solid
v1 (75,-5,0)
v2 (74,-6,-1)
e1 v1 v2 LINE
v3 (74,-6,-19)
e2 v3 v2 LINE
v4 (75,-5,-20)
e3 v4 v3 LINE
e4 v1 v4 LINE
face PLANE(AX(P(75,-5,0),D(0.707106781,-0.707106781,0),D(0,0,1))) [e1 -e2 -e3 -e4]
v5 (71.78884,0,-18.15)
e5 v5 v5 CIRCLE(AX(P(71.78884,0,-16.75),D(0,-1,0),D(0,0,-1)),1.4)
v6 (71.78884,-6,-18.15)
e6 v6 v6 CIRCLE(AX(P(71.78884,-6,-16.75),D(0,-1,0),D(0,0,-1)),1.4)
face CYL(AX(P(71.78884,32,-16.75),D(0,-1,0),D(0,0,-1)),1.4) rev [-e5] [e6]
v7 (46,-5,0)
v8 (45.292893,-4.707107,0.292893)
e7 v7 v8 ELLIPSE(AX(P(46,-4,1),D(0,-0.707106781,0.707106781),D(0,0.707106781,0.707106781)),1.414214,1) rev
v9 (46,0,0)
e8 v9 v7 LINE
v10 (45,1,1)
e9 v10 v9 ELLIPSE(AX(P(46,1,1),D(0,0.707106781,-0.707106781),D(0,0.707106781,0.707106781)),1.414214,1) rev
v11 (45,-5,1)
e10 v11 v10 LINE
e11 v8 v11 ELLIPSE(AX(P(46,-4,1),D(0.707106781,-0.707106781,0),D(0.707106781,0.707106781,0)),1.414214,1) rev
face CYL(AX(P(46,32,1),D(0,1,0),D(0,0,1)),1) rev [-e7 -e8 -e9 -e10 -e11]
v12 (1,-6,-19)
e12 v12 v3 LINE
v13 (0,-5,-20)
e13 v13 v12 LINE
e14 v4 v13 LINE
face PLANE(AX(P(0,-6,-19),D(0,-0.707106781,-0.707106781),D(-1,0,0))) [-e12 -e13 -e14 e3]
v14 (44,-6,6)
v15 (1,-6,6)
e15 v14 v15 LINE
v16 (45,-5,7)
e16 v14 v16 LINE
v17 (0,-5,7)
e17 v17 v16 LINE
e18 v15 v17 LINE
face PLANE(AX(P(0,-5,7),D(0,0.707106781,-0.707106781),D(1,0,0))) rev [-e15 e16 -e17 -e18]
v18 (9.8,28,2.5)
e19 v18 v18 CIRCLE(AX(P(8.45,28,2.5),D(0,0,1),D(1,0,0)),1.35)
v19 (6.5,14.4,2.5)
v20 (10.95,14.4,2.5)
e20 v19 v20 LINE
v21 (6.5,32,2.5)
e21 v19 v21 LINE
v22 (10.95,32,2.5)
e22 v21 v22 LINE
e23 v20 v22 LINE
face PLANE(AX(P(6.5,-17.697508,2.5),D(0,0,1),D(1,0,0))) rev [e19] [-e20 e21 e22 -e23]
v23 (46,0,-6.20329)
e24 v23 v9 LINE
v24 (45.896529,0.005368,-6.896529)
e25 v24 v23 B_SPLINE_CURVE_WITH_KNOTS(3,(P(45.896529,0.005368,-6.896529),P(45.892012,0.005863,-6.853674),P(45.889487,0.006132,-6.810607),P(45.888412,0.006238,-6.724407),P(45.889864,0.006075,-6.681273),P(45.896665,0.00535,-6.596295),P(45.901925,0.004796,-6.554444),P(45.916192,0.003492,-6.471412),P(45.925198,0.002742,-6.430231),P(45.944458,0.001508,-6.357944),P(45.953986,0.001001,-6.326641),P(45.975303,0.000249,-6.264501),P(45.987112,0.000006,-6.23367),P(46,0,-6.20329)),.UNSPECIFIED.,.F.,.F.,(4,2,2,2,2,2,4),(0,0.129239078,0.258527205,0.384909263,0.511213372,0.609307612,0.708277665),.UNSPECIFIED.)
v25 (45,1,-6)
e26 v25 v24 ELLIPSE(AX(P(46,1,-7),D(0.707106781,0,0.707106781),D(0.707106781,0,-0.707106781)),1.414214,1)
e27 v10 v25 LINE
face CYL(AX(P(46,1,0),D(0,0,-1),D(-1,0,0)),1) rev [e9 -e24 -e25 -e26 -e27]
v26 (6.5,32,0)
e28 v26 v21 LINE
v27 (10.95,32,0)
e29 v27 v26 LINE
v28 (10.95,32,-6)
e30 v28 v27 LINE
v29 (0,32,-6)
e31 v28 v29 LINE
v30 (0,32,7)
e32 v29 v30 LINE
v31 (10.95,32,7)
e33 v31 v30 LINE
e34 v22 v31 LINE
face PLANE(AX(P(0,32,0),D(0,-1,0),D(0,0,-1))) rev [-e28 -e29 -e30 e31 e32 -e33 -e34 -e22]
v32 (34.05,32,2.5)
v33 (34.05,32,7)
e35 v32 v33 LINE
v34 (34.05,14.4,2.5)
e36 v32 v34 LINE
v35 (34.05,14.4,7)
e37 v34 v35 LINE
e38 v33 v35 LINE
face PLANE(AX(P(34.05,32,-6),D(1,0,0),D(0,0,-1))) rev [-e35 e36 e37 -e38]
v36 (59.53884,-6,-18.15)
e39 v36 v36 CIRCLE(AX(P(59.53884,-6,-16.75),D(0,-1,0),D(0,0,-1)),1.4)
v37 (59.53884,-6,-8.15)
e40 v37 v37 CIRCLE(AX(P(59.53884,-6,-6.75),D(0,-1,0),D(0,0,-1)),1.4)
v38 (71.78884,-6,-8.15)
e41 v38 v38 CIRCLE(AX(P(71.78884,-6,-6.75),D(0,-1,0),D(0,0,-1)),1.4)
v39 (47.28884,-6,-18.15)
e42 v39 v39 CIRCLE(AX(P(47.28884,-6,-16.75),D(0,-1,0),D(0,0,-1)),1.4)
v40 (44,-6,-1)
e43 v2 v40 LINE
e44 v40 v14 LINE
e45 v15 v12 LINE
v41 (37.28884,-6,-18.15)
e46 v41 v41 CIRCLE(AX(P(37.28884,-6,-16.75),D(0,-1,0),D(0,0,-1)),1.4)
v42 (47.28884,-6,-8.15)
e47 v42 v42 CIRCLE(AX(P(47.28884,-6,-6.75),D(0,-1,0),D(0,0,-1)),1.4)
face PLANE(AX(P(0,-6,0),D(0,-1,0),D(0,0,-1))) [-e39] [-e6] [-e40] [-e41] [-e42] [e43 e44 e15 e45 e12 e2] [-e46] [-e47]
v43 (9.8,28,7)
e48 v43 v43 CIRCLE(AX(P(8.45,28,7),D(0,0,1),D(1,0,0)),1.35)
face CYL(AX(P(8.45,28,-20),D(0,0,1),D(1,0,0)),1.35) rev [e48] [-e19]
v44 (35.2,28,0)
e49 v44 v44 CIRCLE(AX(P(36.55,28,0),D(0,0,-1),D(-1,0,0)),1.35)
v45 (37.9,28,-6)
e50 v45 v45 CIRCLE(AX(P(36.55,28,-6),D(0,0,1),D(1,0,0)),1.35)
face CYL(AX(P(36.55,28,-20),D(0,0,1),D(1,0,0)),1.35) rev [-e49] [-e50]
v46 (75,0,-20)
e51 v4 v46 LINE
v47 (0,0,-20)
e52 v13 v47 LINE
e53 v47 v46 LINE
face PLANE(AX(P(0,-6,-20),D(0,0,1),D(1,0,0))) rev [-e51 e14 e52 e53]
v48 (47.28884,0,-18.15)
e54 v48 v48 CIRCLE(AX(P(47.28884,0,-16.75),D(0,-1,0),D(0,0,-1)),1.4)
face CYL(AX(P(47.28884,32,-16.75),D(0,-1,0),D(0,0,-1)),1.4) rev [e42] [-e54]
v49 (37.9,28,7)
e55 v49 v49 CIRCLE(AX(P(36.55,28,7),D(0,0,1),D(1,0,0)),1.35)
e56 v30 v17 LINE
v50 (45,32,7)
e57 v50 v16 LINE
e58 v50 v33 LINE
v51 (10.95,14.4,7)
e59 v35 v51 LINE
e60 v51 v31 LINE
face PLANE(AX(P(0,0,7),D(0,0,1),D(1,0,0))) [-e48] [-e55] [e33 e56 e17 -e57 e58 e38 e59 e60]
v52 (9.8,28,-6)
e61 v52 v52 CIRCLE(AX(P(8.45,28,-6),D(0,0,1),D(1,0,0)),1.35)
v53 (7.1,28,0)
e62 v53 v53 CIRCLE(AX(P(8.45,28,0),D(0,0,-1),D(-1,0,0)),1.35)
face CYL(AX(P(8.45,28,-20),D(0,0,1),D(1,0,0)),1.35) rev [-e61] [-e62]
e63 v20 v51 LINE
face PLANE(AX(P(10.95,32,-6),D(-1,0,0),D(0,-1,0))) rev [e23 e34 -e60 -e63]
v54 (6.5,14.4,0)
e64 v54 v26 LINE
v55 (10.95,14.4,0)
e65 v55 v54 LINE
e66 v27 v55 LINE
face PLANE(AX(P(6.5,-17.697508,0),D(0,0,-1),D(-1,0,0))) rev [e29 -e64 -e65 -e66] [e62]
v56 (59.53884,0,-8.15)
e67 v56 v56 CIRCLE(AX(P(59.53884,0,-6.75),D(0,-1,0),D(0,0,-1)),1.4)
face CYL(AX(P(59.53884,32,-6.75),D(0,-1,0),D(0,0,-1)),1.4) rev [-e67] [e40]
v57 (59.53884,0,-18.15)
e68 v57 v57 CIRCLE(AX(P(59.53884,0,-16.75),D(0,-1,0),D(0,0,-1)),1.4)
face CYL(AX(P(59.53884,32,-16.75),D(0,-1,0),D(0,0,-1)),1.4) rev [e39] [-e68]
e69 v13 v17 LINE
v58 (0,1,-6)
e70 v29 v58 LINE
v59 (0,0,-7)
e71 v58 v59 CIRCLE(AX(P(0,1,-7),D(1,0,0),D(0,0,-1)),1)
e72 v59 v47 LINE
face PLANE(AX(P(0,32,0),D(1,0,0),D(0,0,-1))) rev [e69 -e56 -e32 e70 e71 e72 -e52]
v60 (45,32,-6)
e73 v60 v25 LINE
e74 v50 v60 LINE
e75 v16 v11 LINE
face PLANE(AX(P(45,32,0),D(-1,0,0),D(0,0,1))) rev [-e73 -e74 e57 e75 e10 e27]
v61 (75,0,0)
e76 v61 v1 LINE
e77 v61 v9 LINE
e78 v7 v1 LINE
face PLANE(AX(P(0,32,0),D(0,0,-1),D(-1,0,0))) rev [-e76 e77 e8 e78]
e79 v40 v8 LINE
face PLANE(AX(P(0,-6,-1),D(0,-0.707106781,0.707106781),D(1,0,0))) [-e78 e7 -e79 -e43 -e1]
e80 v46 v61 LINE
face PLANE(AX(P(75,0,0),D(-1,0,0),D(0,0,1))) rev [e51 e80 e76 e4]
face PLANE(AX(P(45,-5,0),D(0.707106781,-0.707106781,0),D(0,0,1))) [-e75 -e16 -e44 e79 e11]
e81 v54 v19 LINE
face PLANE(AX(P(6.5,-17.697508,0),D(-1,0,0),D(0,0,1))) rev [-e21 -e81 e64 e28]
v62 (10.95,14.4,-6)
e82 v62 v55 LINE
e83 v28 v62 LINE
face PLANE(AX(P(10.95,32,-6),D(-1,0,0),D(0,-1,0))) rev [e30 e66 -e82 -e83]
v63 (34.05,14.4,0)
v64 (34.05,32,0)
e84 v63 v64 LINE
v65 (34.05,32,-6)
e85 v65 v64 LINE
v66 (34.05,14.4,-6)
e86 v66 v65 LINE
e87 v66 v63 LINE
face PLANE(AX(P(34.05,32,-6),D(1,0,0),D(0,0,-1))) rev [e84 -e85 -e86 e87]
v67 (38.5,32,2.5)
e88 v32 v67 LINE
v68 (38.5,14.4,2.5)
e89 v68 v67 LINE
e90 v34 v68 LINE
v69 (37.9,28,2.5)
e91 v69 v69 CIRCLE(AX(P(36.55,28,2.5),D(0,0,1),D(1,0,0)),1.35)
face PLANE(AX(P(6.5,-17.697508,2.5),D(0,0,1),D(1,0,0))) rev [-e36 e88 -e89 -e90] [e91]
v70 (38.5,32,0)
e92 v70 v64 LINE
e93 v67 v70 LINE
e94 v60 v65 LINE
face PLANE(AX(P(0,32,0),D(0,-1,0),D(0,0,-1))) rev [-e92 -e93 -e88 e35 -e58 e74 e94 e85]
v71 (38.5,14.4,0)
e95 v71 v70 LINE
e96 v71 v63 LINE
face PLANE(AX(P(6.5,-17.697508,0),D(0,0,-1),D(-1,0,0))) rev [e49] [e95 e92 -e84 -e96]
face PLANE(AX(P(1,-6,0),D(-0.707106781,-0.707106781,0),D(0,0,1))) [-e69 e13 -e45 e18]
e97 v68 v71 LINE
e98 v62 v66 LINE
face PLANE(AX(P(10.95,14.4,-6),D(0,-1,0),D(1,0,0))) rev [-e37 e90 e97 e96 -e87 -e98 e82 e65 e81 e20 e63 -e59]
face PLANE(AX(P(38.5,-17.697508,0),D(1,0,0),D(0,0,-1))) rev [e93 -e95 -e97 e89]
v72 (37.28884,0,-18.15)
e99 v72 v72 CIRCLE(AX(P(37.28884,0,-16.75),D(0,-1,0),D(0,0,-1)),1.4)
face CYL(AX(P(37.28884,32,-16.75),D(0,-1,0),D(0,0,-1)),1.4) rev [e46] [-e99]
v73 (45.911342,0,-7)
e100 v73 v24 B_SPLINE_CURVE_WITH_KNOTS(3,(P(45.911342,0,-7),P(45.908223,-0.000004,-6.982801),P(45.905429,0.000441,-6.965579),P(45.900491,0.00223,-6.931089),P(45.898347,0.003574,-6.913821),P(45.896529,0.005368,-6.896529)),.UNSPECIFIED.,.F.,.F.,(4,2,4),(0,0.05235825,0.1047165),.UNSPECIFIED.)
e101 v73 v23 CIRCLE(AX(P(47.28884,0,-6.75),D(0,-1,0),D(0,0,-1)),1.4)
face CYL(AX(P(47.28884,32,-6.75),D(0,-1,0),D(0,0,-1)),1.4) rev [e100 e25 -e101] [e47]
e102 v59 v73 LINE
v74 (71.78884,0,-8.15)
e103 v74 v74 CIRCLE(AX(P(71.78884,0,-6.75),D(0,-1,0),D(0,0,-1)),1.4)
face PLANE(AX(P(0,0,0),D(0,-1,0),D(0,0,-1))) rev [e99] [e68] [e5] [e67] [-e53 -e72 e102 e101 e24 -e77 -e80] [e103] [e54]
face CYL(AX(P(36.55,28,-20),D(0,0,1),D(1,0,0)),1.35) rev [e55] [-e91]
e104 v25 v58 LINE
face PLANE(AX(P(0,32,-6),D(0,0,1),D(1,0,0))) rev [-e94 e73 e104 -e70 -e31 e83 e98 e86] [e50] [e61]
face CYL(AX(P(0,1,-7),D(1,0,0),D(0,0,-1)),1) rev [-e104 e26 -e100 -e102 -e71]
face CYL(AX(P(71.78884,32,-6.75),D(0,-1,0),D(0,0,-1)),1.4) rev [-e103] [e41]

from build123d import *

# Parameters (mm, degrees)
SKETCH1_W           = 45
SKETCH1_H           = 6
BOSS_EXTRUDE1_DEPTH = 32
SKETCH2_W           = 23.1
SKETCH2_H           = 17.6
CUT_EXTRUDE1_DEPTH  = 56.542776308
SKETCH3_W           = 45
SKETCH3_H           = 20
BOSS_EXTRUDE2_DEPTH = 6
SKETCH4_W           = 20
SKETCH4_H           = 6
BOSS_EXTRUDE3_DEPTH = 30
SKETCH5_R           = 1.4
CUT_EXTRUDE2_DEPTH  = 87.423376467
BOSS_EXTRUDE4_DEPTH = 7
SKETCH7_W           = 32
SKETCH7_H           = 2.5
CUT_EXTRUDE3_DEPTH  = 17.6
SKETCH8_R           = 1.35
CUT_EXTRUDE4_DEPTH  = 86.895285086
CHAMFER1_SIZE       = 1
FILLET1_R           = 1


with BuildPart() as part:
    # Sketch1 → Boss-Extrude1 (new body)
    with BuildSketch(Plane(origin=(0, 0, 0), x_dir=(1, 0, 0), z_dir=(0, 1, 0))):
        with Locations((22.5, 3)):
            Rectangle(SKETCH1_W, SKETCH1_H)
    extrude(amount=BOSS_EXTRUDE1_DEPTH)

    # Sketch2 → Cut-Extrude1 (cut, through all)
    with BuildSketch(Plane.XY):
        with Locations((22.5, 23.2)):
            Rectangle(SKETCH2_W, SKETCH2_H)
    extrude(amount=-CUT_EXTRUDE1_DEPTH, mode=Mode.SUBTRACT)

    # Sketch3 → Boss-Extrude2 (add)
    with BuildSketch(Plane.XZ):
        with Locations((22.5, -10)):
            Rectangle(SKETCH3_W, SKETCH3_H)
    extrude(amount=BOSS_EXTRUDE2_DEPTH)

    # Sketch4 → Boss-Extrude3 (add)
    with BuildSketch(Plane(origin=(45, 0, 0), x_dir=(0, 0, -1), z_dir=(1, 0, 0))):
        with Locations((10, -3)):
            Rectangle(SKETCH4_W, SKETCH4_H)
    extrude(amount=BOSS_EXTRUDE3_DEPTH)

    # Sketch5 → Cut-Extrude2 (cut, through all)
    with BuildSketch(Plane.XZ.offset(6)):
        with Locations(Location((37.288839919, -16.75, 0), (0, 0, 270))):
            Circle(SKETCH5_R)
        with Locations(Location((47.288839919, -16.75, 0), (0, 0, 270))):
            Circle(SKETCH5_R)
        with Locations(Location((47.288839919, -6.75, 0), (0, 0, 270))):
            Circle(SKETCH5_R)
        with Locations(Location((59.538839919, -16.75, 0), (0, 0, 270))):
            Circle(SKETCH5_R)
        with Locations(Location((71.788839919, -16.75, 0), (0, 0, 270))):
            Circle(SKETCH5_R)
        with Locations(Location((71.788839919, -6.75, 0), (0, 0, 270))):
            Circle(SKETCH5_R)
        with Locations(Location((59.538839919, -6.75, 0), (0, 0, 270))):
            Circle(SKETCH5_R)
    extrude(amount=-CUT_EXTRUDE2_DEPTH, mode=Mode.SUBTRACT)

    # Sketch6 → Boss-Extrude4 (add)
    with BuildSketch(Plane.XY):
        Polygon((0, 32), (0, -6), (45, -6), (45, 0), (45, 32), (34.05, 32), (34.05, 14.4), (10.95, 14.4), (10.95, 32), align=None)
    extrude(amount=BOSS_EXTRUDE4_DEPTH)

    # Sketch7 → Cut-Extrude3 (cut)
    with BuildSketch(Plane(origin=(0, 32, 0), x_dir=(1, 0, 0), z_dir=(0, 1, 0))):
        with Locations((22.5, -1.25)):
            Rectangle(SKETCH7_W, SKETCH7_H)
    extrude(amount=-CUT_EXTRUDE3_DEPTH, mode=Mode.SUBTRACT)

    # Sketch8 → Cut-Extrude4 (cut, through all)
    with BuildSketch(Plane.XY.offset(7)):
        with Locations((8.45, 28)):
            Circle(SKETCH8_R)
        with Locations((36.55, 28)):
            Circle(SKETCH8_R)
    extrude(amount=-CUT_EXTRUDE4_DEPTH, mode=Mode.SUBTRACT)

    # Chamfer1
    chamfer1_edges = [part.edges().sort_by_distance(p)[0] for p in [
        (22.5, -6, 7),
        (0, -6, -6.5),
        (37.5, -6, -20),
        (60, -6, 0),
        (75, -6, -10),
        (45, -6, 3.5),
    ]]
    chamfer(chamfer1_edges, length=CHAMFER1_SIZE)

    # Fillet1
    # the kernel refuses this fillet: 1 mm, written as the material it adds along each edge
    with BuildSketch(Plane(origin=(45, 0, -6), x_dir=(0, 1, 0), z_dir=(0, 0, 1))) as fillet1_piece_1:
        with BuildLine():
            CenterArc((FILLET1_R, -FILLET1_R), FILLET1_R, 90, 90)
            Line((0, -FILLET1_R), (0, 0))
            Line((0, 0), (FILLET1_R, 0))
        make_face()
    extrude(amount=6)
    with BuildSketch(Plane(origin=(45, 0, -6), x_dir=(0, 0, -1), z_dir=(-1, 0, 0))) as fillet1_piece_2:
        with BuildLine():
            CenterArc((FILLET1_R, -FILLET1_R), FILLET1_R, 90, 90)
            Line((0, -FILLET1_R), (0, 0))
            Line((0, 0), (FILLET1_R, 0))
        make_face()
    extrude(amount=45)
    with BuildSketch(Plane(origin=(45, -7.5, 0), x_dir=(1, 0, 0), z_dir=(0, 1, 0))) as fillet1_piece_3_section:
        with BuildLine():
            CenterArc((FILLET1_R, -FILLET1_R), FILLET1_R, 90, 90)
            Line((0, -FILLET1_R), (0, 0))
            Line((0, 0), (FILLET1_R, 0))
        make_face()
    fillet1_piece_3 = extrude(amount=7.5, mode=Mode.PRIVATE)
    fillet1_piece_3 = split(fillet1_piece_3, bisect_by=Plane(origin=(45.042981958, -4.592558865, 0.407441135), z_dir=(0, -0.7071067811865476, 0.7071067811865476)), keep=Keep.TOP, mode=Mode.PRIVATE)
    fillet1_piece_3 = split(fillet1_piece_3, bisect_by=Plane(origin=(45.16446835, -4.83553165, 0.528927527), z_dir=(-0.7071067811865476, 0.7071067811865476, 0)), keep=Keep.TOP, mode=Mode.PRIVATE)
    add(fillet1_piece_3)
    with BuildSketch(Plane(origin=(45, -7.5, 0), x_dir=(1, 0, 0), z_dir=(0, 1, 0))) as fillet1_piece_4_section:
        with BuildLine():
            CenterArc((FILLET1_R, -FILLET1_R), FILLET1_R, 90, 90)
            Line((0, -FILLET1_R), (0, 0))
            Line((0, 0), (FILLET1_R, 0))
        make_face()
    fillet1_piece_4 = extrude(amount=7.5, mode=Mode.PRIVATE)
    fillet1_piece_4 = split(fillet1_piece_4, bisect_by=Plane(origin=(45.528927527, -4.83553165, 0.16446835), z_dir=(0, 0.7071067811865476, -0.7071067811865476)), keep=Keep.TOP, mode=Mode.PRIVATE)
    fillet1_piece_4 = split(fillet1_piece_4, bisect_by=Plane(origin=(45.407441135, -4.592558865, 0.042981958), z_dir=(0.7071067811865476, -0.7071067811865476, 0)), keep=Keep.TOP, mode=Mode.PRIVATE)
    add(fillet1_piece_4)
    with BuildSketch(Plane(origin=(45, -7.5, 0), x_dir=(1, 0, 0), z_dir=(0, 1, 0))) as fillet1_piece_5_section:
        with BuildLine():
            CenterArc((FILLET1_R, -FILLET1_R), FILLET1_R, 90, 90)
            Line((0, -FILLET1_R), (0, 0))
            Line((0, 0), (FILLET1_R, 0))
        make_face()
    fillet1_piece_5 = extrude(amount=7.5, mode=Mode.PRIVATE)
    fillet1_piece_5 = split(fillet1_piece_5, bisect_by=Plane(origin=(45.222376568, -3.546419499, 1.453580501), z_dir=(0, 0.7071067811865476, -0.7071067811865476)), keep=Keep.TOP, mode=Mode.PRIVATE)
    fillet1_piece_5 = split(fillet1_piece_5, bisect_by=Plane(origin=(46.453580501, -3.546419499, 0.222376568), z_dir=(-0.7071067811865476, 0.7071067811865476, 0)), keep=Keep.TOP, mode=Mode.PRIVATE)
    add(fillet1_piece_5)
    with BuildSketch(Plane(origin=(45, 0, -8.5), x_dir=(0, 1, 0), z_dir=(0, 0, 1))) as fillet1_piece_6a_section:
        with BuildLine():
            CenterArc((FILLET1_R, -FILLET1_R), FILLET1_R, 90, 90)
            Line((0, -FILLET1_R), (0, 0))
            Line((0, 0), (FILLET1_R, 0))
        make_face()
    fillet1_piece_6a = extrude(amount=8.5, mode=Mode.PRIVATE)
    fillet1_piece_6a = split(fillet1_piece_6a, bisect_by=Plane(origin=(45.224393795, 0.227043758, -6), z_dir=(0, 0, -1)), keep=Keep.TOP, mode=Mode.PRIVATE)
    fillet1_piece_6a = fillet1_piece_6a - Plane(origin=(47.288839919, 0.227043758, -6.75), x_dir=(0, 0, -1), z_dir=(0, -1, 0)) * Cylinder(1.4, 21, mode=Mode.PRIVATE)
    with BuildSketch(Plane(origin=(47.5, 0, -6), x_dir=(0, 0, -1), z_dir=(-1, 0, 0))) as fillet1_piece_6b_section:
        with BuildLine():
            CenterArc((FILLET1_R, -FILLET1_R), FILLET1_R, 90, 90)
            Line((0, -FILLET1_R), (0, 0))
            Line((0, 0), (FILLET1_R, 0))
        make_face()
    fillet1_piece_6b = extrude(amount=47.5, mode=Mode.PRIVATE)
    fillet1_piece_6b = split(fillet1_piece_6b, bisect_by=Plane(origin=(45, 0.236066937, -6.212082633), z_dir=(1, 0, 0)), keep=Keep.TOP, mode=Mode.PRIVATE)
    fillet1_piece_6b = fillet1_piece_6b - Plane(origin=(47.288839919, 0.236066937, -6.75), x_dir=(0, 0, -1), z_dir=(0, -1, 0)) * Cylinder(1.4, 99, mode=Mode.PRIVATE)
    fillet1_piece_6 = fillet1_piece_6a & fillet1_piece_6b
    add(fillet1_piece_6)
    with BuildSketch(Plane(origin=(45, -7.5, 0), x_dir=(1, 0, 0), z_dir=(0, 1, 0))) as fillet1_piece_7a_section:
        with BuildLine():
            CenterArc((FILLET1_R, -FILLET1_R), FILLET1_R, 90, 90)
            Line((0, -FILLET1_R), (0, 0))
            Line((0, 0), (FILLET1_R, 0))
        make_face()
    fillet1_piece_7a = extrude(amount=10, mode=Mode.PRIVATE)
    fillet1_piece_7a = split(fillet1_piece_7a, bisect_by=Plane(origin=(45.226395114, 0, 0.226395114), z_dir=(0, 1, 0)), keep=Keep.TOP, mode=Mode.PRIVATE)
    with BuildSketch(Plane(origin=(45, 0, -6), x_dir=(0, 1, 0), z_dir=(0, 0, 1))) as fillet1_piece_7b_section:
        with BuildLine():
            CenterArc((FILLET1_R, -FILLET1_R), FILLET1_R, 90, 90)
            Line((0, -FILLET1_R), (0, 0))
            Line((0, 0), (FILLET1_R, 0))
        make_face()
    fillet1_piece_7b = extrude(amount=8.5, mode=Mode.PRIVATE)
    fillet1_piece_7b = split(fillet1_piece_7b, bisect_by=Plane(origin=(45.226395114, 0.226395114, 0), z_dir=(0, 0, 1)), keep=Keep.TOP, mode=Mode.PRIVATE)
    fillet1_piece_7 = fillet1_piece_7a & fillet1_piece_7b
    add(fillet1_piece_7)


solid = part.part
